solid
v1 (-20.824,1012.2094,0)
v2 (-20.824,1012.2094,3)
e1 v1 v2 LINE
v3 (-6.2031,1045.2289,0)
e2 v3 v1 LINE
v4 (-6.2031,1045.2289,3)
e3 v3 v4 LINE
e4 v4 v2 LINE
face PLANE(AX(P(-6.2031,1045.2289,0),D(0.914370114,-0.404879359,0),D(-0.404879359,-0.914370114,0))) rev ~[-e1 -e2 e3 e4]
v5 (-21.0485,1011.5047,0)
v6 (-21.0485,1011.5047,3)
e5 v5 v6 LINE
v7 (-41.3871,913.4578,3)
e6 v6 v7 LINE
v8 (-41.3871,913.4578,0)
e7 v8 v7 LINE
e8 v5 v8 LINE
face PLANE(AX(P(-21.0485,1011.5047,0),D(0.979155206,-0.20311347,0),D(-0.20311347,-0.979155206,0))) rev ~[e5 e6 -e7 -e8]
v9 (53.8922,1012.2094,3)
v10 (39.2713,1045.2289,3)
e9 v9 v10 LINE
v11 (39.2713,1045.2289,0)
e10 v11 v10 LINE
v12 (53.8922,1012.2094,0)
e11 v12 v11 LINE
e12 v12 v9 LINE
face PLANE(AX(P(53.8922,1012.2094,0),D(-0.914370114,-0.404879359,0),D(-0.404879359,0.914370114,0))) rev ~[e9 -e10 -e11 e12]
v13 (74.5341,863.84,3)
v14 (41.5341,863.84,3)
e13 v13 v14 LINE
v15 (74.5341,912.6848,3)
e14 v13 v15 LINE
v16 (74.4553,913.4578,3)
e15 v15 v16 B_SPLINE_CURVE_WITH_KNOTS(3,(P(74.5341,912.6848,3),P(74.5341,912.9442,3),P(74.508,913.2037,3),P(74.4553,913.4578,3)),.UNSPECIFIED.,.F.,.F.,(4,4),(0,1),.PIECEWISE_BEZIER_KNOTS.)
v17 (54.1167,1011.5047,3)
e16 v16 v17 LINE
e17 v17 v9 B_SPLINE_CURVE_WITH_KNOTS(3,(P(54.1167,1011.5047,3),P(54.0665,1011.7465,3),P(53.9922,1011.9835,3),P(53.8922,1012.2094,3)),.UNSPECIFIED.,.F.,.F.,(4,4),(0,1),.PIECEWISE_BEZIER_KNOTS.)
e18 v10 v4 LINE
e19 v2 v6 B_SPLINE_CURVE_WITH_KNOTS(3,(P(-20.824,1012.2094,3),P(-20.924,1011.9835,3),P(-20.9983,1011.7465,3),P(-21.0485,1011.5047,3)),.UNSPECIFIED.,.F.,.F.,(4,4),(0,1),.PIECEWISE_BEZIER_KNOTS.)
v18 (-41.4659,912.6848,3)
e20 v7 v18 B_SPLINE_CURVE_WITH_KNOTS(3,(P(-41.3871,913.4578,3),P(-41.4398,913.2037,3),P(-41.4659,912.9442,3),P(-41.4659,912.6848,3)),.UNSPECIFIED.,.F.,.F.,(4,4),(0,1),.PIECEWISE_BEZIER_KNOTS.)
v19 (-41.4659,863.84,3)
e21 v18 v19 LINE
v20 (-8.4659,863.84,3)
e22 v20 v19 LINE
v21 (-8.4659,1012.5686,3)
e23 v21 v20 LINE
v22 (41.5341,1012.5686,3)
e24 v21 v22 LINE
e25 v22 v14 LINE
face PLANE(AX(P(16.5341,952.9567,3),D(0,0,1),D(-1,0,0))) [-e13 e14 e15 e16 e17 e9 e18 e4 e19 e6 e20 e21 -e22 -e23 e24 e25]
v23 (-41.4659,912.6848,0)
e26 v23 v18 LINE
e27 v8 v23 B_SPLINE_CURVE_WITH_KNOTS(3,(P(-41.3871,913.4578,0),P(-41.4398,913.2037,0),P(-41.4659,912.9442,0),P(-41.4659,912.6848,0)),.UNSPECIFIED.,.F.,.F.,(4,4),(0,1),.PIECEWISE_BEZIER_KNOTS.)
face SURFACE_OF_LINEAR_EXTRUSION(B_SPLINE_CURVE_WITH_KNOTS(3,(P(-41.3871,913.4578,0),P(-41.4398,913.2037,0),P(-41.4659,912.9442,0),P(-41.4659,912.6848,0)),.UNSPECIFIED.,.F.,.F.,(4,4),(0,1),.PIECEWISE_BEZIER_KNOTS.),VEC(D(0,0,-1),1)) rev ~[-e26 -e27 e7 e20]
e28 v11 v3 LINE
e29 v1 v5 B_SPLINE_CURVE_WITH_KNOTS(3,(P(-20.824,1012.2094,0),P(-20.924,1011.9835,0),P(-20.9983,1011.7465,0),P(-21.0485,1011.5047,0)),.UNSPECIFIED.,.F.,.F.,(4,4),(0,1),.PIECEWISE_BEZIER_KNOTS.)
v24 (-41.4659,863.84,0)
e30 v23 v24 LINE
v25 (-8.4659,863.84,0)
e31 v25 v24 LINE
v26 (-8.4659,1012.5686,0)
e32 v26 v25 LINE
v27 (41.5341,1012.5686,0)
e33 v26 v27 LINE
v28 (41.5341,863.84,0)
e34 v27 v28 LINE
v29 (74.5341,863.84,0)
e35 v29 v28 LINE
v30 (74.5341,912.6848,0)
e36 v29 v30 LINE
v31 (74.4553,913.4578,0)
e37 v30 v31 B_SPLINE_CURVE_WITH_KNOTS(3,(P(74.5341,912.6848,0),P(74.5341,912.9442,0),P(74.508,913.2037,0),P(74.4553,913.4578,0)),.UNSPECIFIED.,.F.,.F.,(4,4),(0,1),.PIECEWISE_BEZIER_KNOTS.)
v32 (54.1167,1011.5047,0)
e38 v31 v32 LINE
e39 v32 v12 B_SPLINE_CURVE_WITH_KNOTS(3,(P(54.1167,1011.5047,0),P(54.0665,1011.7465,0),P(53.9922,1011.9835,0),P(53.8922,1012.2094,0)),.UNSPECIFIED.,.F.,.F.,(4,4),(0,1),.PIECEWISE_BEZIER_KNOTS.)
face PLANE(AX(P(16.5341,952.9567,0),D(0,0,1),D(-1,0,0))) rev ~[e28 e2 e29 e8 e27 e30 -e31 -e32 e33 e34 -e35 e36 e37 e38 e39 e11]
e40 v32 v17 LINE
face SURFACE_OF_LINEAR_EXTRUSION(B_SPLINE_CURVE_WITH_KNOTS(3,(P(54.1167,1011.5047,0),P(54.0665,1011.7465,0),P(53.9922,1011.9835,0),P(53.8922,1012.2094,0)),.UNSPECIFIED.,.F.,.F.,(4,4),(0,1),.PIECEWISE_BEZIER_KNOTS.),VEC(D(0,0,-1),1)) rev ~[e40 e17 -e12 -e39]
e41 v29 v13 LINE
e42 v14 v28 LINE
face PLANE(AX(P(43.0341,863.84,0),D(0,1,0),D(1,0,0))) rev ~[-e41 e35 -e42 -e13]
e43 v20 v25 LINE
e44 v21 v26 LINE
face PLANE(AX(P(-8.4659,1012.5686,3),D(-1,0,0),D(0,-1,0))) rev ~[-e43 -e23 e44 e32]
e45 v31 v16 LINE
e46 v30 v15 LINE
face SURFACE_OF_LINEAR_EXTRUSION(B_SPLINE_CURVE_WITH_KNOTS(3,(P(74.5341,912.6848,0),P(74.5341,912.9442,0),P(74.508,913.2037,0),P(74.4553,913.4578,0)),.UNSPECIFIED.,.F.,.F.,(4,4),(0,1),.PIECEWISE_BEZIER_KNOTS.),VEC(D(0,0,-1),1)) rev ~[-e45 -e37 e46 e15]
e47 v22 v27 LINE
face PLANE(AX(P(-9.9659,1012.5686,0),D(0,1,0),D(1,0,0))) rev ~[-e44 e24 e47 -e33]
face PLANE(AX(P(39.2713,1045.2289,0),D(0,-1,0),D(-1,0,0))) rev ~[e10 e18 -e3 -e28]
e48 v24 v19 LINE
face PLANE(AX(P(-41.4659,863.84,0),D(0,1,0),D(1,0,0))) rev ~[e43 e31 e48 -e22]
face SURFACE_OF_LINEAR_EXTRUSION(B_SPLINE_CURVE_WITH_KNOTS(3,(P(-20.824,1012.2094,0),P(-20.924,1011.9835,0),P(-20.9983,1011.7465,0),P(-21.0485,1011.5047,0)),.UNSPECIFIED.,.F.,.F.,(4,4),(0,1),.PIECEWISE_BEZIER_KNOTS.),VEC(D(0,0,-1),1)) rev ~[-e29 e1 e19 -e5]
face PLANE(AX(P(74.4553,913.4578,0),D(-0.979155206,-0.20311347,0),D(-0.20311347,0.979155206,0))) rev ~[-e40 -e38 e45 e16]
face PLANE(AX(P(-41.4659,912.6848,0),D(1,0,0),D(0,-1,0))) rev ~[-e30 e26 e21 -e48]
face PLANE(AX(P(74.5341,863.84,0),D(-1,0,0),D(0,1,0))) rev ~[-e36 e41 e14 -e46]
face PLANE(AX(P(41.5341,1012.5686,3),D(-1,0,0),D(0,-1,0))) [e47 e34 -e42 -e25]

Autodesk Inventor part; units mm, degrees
ref_plane "YZ Plane" through (0, 0, 0) normal (1, 0, 0) x (0, 1, 0)
ref_plane "XZ Plane" through (0, 0, 0) normal (0, 1, 0) x (-1, 0, 0)
ref_plane "Work Plane1" through (16.5341, 952.9567, 0) normal (0, 0, 1) x (-1, 0, 0)
sketch "Sketch4" plane through (16.5341, 952.9567, 3) normal (0, 0, 1) x (1, 0, 0)
  line L0 (-26.5, -89.1167) -> (-26.5, 59.6119)
  line L1 (26.5, 59.6119) -> (26.5, -89.1167)
  line L2 (-26.5, 59.6119) -> (26.5, 59.6119)
  line L3 (-25, 59.6119) -> (-25, -89.1167)
  line L4 (26.5, 59.6119) -> (-26.5, 59.6119)
  line L5 (25, 59.6119) -> (25, -89.1167)
  line L6 (-26.5, -89.1167) -> (-25, -89.1167)
  line L7 (58, -89.1167) -> (26.5, -89.1167)
  line L8 (26.5, -89.1167) -> (25, -89.1167)
  point P0 (-16.5341, -952.9567)
  dimension "d15" = 1.5
  dimension "d16" = 1.5
sketch "Sketch1" plane through (16.5341, 952.9567, 0) normal (0, 0, 1) x (-1, 0, 0)
  line L0 (60, 40.2719) -> (60, 137.1193)
  ellipse E0 centre (56, 137.1193) end of major axis (56, 141.9614) minor radius 4 (60, 137.1193) -> (56, 141.9614) ccw
  line L1 (56, 141.9614) -> (24.75, 141.9614)
  line L2 (24.75, 141.9614) -> (24.75, 144.3824)
  line L3 (24.75, 144.3824) -> (24.75, 146.8034)
  line L4 (24.75, 146.8034) -> (56, 146.8034)
  ellipse E1 centre (56, 137.1193) end of major axis (56, 146.8034) minor radius 8 (64, 137.1193) -> (56, 146.8034) ccw
  line L5 (64, 137.1193) -> (64, 40.2719)
  ellipse E2 centre (56, 40.2719) end of major axis (56, 30.5879) minor radius 8 (63.7591, 37.9134) -> (64, 40.2719) ccw
  line L6 (63.7591, 37.9134) -> (43.4204, -60.1335)
  ellipse E3 centre (35.6613, -57.775) end of major axis (35.6613, -67.459) minor radius 8 (42.7123, -62.3499) -> (43.4204, -60.1335) ccw
  line L7 (42.7123, -62.3499) -> (7.051, -142.8866)
  ellipse E4 centre (0, -138.3116) end of major axis (0, -147.9957) minor radius 8 (-7.051, -142.8866) -> (7.051, -142.8866) ccw
  line L8 (-7.051, -142.8866) -> (-42.7123, -62.3499)
  ellipse E5 centre (-35.6613, -57.775) end of major axis (-35.6613, -67.459) minor radius 8 (-43.4204, -60.1335) -> (-42.7123, -62.3499) ccw
  line L9 (-43.4204, -60.1335) -> (-63.7591, 37.9134)
  ellipse E6 centre (-56, 40.2719) end of major axis (-56, 30.5879) minor radius 8 (-64, 40.2719) -> (-63.7591, 37.9134) ccw
  line L10 (-64, 40.2719) -> (-64, 137.1193)
  ellipse E7 centre (-56, 137.1193) end of major axis (-56, 146.8034) minor radius 8 (-56, 146.8034) -> (-64, 137.1193) ccw
  line L11 (-56, 146.8034) -> (-24.75, 146.8034)
  line L12 (-24.75, 146.8034) -> (-24.75, 144.3824)
  line L13 (-24.75, 144.3824) -> (-24.75, 141.9614)
  line L14 (-24.75, 141.9614) -> (-56, 141.9614)
  ellipse E8 centre (-56, 137.1193) end of major axis (-56, 141.9614) minor radius 4 (-56, 141.9614) -> (-60, 137.1193) ccw
  line L15 (-60, 137.1193) -> (-60, 40.2719)
  ellipse E9 centre (-56, 40.2719) end of major axis (-56, 35.4299) minor radius 4 (-60, 40.2719) -> (-59.8796, 39.0927) ccw
  line L16 (-59.8796, 39.0927) -> (-39.5409, -58.9542)
  ellipse E10 centre (-35.6613, -57.775) end of major axis (-35.6613, -62.617) minor radius 4 (-39.5409, -58.9542) -> (-39.1868, -60.0624) ccw
  line L17 (-39.1868, -60.0624) -> (-3.5255, -140.5991)
  ellipse E11 centre (0, -138.3116) end of major axis (0, -143.1536) minor radius 4 (-3.5255, -140.5991) -> (3.5255, -140.5991) ccw
  line L18 (3.5255, -140.5991) -> (39.1868, -60.0624)
  ellipse E12 centre (35.6613, -57.775) end of major axis (35.6613, -62.617) minor radius 4 (39.1868, -60.0624) -> (39.5409, -58.9542) ccw
  line L19 (39.5409, -58.9542) -> (59.8796, 39.0927)
  ellipse E13 centre (56, 40.2719) end of major axis (56, 35.4299) minor radius 4 (59.8796, 39.0927) -> (60, 40.2719) ccw
  line L20 (-24.75, 141.9614) -> (24.75, 141.9614)
  line L21 (-60, 91.1167) -> (60, 91.1167)
  line L22 (-24.0389, -94.2722) -> (24.0389, -94.2722)
  line L23 (-24.5, 91.1167) -> (-24.5, -57.6119)
  line L24 (-24.5, -57.6119) -> (24.5, -57.6119)
  line L25 (24.5, -57.6119) -> (24.5, 91.1167)
  point P0 (16.5341, 952.9567)
  dimension "d0" = 49
  dimension "d1" = 120
  dimension "d2" = 35.5
  dimension "d3" = 88.0788
  dimension "d4" = 44.0394
  dimension "d5" = 101.6894
  dimension "d6" = 50.8447
  dimension "d7" = 15
extrude "Plate1" add sketch "Sketch1" along normal blind 3 contours E13 L19 E12 L18 L22 L17 E10 L16 E9 L15 L21 L23 L24 L25 L0
sketch "Sketch2" plane through (16.5341, 952.9567, 0) normal (0, 0, -1) x (-1, 0, 0)
  line L0 (60, -40.2719) -> (60, -91.1167) projected
  ellipse E0 centre (56, -40.2719) end of major axis (56, -35.4299) minor radius 4 (60, -40.2719) -> (59.8796, -39.0927) ccw projected
  line L1 (39.5409, 58.9542) -> (59.8796, -39.0927) projected
  ellipse E1 centre (35.6613, 57.775) end of major axis (35.6613, 62.617) minor radius 4 (39.5409, 58.9542) -> (39.1868, 60.0624) ccw projected
  line L2 (24.0389, 94.2722) -> (39.1868, 60.0624) projected
  line L3 (-24.0389, 94.2722) -> (24.0389, 94.2722) projected
  line L4 (-39.1868, 60.0624) -> (-24.0389, 94.2722) projected
  ellipse E2 centre (-35.6613, 57.775) end of major axis (-35.6613, 62.617) minor radius 4 (-39.1868, 60.0624) -> (-39.5409, 58.9542) ccw projected
  line L5 (-59.8796, -39.0927) -> (-39.5409, 58.9542) projected
  ellipse E3 centre (-56, -40.2719) end of major axis (-56, -35.4299) minor radius 4 (-59.8796, -39.0927) -> (-60, -40.2719) ccw projected
  line L6 (-60, -91.1167) -> (-60, -40.2719) projected
  line L7 (-24.5, -91.1167) -> (-60, -91.1167) projected
  line L8 (-24.5, 57.6119) -> (-24.5, -91.1167) projected
  line L9 (24.5, 57.6119) -> (-24.5, 57.6119) projected
  line L10 (24.5, -91.1167) -> (24.5, 57.6119) projected
  line L11 (60, -91.1167) -> (24.5, -91.1167) projected
  line L12 (-57.9212, -39.4989) -> (-37.5826, 58.548)
  line L13 (-37.3581, 59.2527) -> (-22.7372, 92.2722)
  line L14 (-22.7372, 92.2722) -> (22.7372, 92.2722)
  line L15 (22.7372, 92.2722) -> (37.3581, 59.2527)
  line L16 (37.5826, 58.548) -> (57.9212, -39.4989)
  line L17 (58, -40.2719) -> (58, -89.1167)
  line L18 (58, -89.1167) -> (26.5, -89.1167)
  line L19 (26.5, -89.1167) -> (26.5, 59.6119)
  line L20 (26.5, 59.6119) -> (-26.5, 59.6119)
  line L21 (-26.5, 59.6119) -> (-26.5, -89.1167)
  line L22 (-26.5, -89.1167) -> (-58, -89.1167)
  line L23 (-58, -89.1167) -> (-58, -40.2719)
  spline S0 degree 3 poles (-58, -40.2719) (-58, -40.0125) (-57.9739, -39.753) (-57.9212, -39.4989) knots 0 0 0 0 1 1 1 1
  spline S1 degree 3 poles (-37.5826, 58.548) (-37.5324, 58.7898) (-37.4581, 59.0268) (-37.3581, 59.2527) knots 0 0 0 0 1 1 1 1
  spline S2 degree 3 poles (37.3581, 59.2527) (37.4581, 59.0268) (37.5324, 58.7898) (37.5826, 58.548) knots 0 0 0 0 1 1 1 1
  spline S3 degree 3 poles (57.9212, -39.4989) (57.9739, -39.753) (58, -40.0125) (58, -40.2719) knots 0 0 0 0 1 1 1 1
  point P0 (16.5341, -952.9567)
  dimension "d9" = 2
extrude "Cut1" cut sketch "Sketch2" against normal blind 3
ref_plane "midtplan" through (16.5341, 863.84, 0) normal (1, 0, 0) x (0, 0, -1)
ref_plane "modplan parallel med plade" through (16.5341, 952.9567, 1.5) normal (0, 0, 1) x (1, 0, 0)
sheet face with bend "Face2" sketch "Sketch4" thickness 3 toward (0, 0, -1) bend radius 3
bend "Bend1"
equation "\"d2\" = -0.5 * d0 + 0.5 * d1"
equation "\"d4\" = 0.5 * d3"
equation "\"d6\" = 0.5 * d5"
equation "\"d10\" = Thickness"
equation "\"d16\" = d15"
equation "\"d8\" = Thickness"
equation "\"d17\" = BendRadius"
equation "\"d18\" = BendReliefWidth"
equation "\"d20\" = MinimumRemnant"
equation "\"d19\" = BendReliefDepth"
equation "\"d21\" = TransitionRadius"
equation "\"Thickness\" = pladetykkelse"
equation "\"BendRadius\" = Thickness"
equation "\"BendReliefWidth\" = Thickness"
equation "\"BendReliefDepth\" = 0.5 * Thickness"
equation "\"CornerReliefSize\" = 4 * Thickness"
equation "\"MinimumRemnant\" = 2 * Thickness"
equation "\"TransitionRadius\" = BendRadius"
equation "\"JacobiRadiusSize\" = BendRadius"
equation "\"GapSize\" = Thickness"
equation "\"pladetykkelse\" = 3"
equation "\"trappevinkel\" = 34.3deg"
equation "\"trappestifter_dia\" = 25"
equation "\"trappestifter_huldia\" = 25.8"
equation "\"trappestifter_skraa_huldia\" = 26.6"
equation "\"trappestifter_laengde\" = 228"
equation "\"perforeringsbredde\" = 6"
equation "\"perforeringshullaengde\" = 62.8"
equation "\"perforeringshullaengde_top\" = 61"
equation "\"perforeringshullaengde_bund\" = 61.6"
equation "\"perforeringsoffset\" = 8"
equation "\"perforeringsoffset_top\" = 8"
equation "\"perforeringsoffset_bund\" = 8"
equation "\"laskehul_dia\" = 13"
equation "\"balusterhul_udvidelse\" = 1"
equation "\"trinbredde\" = 1884"
properties part number "baluster-fod" material "S355MC"
